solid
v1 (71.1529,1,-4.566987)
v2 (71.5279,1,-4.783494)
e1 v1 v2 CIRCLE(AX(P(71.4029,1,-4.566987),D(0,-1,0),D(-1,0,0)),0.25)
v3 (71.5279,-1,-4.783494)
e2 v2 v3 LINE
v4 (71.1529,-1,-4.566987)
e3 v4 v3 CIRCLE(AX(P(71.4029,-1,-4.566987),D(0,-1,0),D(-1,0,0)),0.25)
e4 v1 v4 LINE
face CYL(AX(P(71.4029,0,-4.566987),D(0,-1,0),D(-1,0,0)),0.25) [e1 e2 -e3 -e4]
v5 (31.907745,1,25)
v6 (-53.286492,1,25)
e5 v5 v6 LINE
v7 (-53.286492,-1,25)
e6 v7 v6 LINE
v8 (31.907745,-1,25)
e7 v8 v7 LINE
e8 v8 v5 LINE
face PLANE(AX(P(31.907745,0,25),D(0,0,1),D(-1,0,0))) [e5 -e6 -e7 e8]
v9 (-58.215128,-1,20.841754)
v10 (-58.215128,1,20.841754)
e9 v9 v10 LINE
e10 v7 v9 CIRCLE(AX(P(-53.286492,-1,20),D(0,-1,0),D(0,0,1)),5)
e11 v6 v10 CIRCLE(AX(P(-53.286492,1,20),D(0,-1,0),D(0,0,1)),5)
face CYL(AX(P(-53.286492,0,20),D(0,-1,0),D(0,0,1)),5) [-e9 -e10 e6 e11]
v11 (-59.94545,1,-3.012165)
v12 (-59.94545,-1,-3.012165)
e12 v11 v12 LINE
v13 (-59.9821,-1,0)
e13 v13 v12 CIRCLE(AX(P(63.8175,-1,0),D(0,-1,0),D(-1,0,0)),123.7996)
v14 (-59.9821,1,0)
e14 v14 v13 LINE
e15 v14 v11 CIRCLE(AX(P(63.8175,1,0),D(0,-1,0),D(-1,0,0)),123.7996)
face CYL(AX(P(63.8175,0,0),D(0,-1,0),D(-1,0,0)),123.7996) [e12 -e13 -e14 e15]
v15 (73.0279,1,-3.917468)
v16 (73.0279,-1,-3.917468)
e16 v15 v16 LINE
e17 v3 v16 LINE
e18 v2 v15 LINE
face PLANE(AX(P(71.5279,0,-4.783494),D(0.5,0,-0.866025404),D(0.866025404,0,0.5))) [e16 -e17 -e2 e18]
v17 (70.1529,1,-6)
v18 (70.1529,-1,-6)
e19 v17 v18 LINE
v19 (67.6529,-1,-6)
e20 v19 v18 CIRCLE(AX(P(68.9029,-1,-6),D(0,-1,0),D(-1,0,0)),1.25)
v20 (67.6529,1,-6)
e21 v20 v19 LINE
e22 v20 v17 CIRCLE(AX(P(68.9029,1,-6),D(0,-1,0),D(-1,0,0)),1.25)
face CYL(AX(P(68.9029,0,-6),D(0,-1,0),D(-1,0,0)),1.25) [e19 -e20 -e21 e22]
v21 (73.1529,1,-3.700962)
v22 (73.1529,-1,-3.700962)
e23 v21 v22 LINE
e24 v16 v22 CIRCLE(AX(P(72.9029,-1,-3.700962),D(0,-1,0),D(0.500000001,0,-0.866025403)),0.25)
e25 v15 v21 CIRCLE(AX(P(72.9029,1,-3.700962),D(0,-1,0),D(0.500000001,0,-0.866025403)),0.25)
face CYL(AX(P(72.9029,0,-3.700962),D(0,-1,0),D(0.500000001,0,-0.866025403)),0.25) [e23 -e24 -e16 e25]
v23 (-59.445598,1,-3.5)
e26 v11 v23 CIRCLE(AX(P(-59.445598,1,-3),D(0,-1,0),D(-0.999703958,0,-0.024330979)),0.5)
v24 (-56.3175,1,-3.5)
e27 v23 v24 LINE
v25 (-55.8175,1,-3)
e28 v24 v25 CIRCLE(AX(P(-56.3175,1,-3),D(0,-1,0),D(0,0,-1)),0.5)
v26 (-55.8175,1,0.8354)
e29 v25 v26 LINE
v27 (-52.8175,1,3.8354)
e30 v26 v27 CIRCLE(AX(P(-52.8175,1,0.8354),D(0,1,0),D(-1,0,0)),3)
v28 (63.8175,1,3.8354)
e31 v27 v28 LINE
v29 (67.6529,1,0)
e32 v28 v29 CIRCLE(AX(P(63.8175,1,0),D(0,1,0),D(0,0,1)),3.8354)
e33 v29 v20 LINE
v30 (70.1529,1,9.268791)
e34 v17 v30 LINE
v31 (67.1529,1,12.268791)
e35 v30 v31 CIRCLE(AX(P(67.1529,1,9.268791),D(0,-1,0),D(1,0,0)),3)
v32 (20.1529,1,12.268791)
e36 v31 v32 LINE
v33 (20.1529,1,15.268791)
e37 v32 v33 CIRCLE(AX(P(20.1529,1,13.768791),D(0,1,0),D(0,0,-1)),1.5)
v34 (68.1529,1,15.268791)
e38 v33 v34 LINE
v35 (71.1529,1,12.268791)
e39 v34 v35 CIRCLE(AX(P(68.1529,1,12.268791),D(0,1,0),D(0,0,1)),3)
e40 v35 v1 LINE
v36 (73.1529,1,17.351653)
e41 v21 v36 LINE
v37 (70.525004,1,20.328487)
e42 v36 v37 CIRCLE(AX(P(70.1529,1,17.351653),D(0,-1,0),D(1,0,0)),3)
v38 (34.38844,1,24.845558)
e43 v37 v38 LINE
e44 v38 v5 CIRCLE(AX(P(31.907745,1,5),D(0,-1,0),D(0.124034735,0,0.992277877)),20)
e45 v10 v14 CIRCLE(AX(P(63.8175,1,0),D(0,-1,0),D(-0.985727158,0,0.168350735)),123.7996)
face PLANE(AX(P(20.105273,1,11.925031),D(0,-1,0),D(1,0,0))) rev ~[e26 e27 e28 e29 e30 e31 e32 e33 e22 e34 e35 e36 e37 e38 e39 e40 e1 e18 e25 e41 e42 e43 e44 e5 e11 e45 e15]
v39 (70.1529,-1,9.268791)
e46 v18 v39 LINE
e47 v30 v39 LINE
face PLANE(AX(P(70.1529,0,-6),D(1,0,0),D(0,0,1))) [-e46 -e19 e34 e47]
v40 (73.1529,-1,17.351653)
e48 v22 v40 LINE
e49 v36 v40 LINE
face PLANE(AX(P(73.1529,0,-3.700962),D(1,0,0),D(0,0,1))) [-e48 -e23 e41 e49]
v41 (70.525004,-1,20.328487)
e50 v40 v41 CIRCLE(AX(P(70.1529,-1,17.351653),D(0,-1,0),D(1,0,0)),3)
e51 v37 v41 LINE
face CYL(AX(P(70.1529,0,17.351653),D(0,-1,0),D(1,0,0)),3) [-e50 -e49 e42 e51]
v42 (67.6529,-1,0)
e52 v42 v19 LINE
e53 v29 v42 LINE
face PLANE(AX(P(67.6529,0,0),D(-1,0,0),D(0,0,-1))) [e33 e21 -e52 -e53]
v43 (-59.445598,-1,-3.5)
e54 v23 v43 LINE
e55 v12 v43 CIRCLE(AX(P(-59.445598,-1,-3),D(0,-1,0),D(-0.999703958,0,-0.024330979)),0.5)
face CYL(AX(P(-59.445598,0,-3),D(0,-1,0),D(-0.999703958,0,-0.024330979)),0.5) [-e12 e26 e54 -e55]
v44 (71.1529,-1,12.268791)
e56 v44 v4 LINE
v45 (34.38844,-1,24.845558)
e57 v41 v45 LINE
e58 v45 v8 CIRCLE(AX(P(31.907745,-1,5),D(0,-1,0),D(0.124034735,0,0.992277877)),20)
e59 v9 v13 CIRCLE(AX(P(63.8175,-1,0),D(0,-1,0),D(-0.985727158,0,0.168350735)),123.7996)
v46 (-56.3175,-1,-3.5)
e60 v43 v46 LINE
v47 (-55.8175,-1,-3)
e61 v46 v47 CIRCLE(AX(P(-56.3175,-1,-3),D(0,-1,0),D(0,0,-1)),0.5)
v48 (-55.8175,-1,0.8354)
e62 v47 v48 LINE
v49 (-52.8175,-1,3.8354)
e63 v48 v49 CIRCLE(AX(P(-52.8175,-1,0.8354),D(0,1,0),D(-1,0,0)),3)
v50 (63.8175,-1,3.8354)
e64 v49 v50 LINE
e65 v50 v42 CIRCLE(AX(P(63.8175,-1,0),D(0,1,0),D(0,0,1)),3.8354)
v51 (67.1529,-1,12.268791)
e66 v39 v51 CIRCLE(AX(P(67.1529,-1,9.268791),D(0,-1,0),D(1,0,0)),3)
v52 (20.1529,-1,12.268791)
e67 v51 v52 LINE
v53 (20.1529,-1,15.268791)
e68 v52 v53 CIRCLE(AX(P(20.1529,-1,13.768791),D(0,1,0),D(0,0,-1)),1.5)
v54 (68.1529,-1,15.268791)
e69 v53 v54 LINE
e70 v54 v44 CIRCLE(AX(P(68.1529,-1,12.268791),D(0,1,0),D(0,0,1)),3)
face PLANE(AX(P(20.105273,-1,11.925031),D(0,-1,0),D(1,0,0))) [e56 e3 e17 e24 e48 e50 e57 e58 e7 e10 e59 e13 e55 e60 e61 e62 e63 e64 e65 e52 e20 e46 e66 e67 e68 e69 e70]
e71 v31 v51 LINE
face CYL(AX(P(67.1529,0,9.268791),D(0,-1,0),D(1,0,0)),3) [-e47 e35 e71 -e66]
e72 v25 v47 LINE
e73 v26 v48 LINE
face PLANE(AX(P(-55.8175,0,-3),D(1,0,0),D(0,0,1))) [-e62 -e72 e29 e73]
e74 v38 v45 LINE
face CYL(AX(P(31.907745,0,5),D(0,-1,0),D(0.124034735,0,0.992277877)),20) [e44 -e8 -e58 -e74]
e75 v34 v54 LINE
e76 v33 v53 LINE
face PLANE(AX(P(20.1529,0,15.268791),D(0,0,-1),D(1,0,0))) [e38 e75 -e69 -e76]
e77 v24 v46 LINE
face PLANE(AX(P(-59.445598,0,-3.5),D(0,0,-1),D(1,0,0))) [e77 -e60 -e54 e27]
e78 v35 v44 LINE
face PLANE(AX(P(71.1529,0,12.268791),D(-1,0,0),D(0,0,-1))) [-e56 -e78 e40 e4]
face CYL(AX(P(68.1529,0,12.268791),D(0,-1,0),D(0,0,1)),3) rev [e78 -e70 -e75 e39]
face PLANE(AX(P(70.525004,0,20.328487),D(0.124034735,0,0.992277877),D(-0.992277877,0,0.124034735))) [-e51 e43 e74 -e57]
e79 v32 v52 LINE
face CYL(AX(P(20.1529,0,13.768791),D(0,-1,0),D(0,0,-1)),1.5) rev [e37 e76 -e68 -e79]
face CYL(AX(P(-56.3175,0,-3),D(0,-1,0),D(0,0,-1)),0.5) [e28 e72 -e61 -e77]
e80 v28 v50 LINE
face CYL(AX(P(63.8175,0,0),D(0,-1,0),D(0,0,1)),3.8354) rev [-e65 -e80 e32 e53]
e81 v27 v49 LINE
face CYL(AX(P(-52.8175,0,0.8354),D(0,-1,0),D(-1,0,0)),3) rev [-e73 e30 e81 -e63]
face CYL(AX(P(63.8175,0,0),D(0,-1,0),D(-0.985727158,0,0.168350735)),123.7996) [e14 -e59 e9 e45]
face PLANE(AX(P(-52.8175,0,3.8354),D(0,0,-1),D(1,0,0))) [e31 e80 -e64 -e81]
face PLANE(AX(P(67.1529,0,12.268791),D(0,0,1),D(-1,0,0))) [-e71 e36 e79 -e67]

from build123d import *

# Parameters (mm, degrees)
F1_DEPTH = 1


# Not quite as in the source:
# - a feature names something its author has since deleted; it is built from what else it names


with BuildPart() as f1:
    # F0 (on Front) → F1 (new body, symmetric)
    with BuildSketch(Plane.XZ):
        with BuildLine():
            ThreePointArc((-58.215127866, 20.8417536759), (-59.5395660257, 10.4582609311), (-59.9821, 0))
            ThreePointArc((-59.9821, 0), (-59.9729371877, -1.5061942231), (-59.9454501071, -3.0121654896))
            ThreePointArc((-59.9454501071, -3.0121654896), (-59.7948238827, -3.3578286914), (-59.4455981282, -3.5))
            Line((-59.4455981282, -3.5), (-56.3175, -3.5))
            ThreePointArc((-56.3175, -3.5), (-55.9639466094, -3.3535533906), (-55.8175, -3))
            Line((-55.8175, -3), (-55.8175, 0.8354))
            ThreePointArc((-55.8175, 0.8354), (-54.9388203436, 2.9567203436), (-52.8175, 3.8354))
            Line((-52.8175, 3.8354), (63.8175, 3.8354))
            ThreePointArc((63.8175, 3.8354), (66.5295373486, 2.7120373486), (67.6529, 0))
            Line((67.6529, 0), (67.6529, -6))
            ThreePointArc((67.6529, -6), (68.9029, -7.25), (70.1529, -6))
            Line((70.1529, -6), (70.1529, 9.2687909752))
            ThreePointArc((70.1529, 9.2687909752), (69.2742203436, 11.3901113188), (67.1529, 12.2687909752))
            Line((67.1529, 12.2687909752), (20.1529, 12.2687909752))
            ThreePointArc((20.1529, 12.2687909752), (18.6529, 13.7687909752), (20.1529, 15.2687909752))
            Line((20.1529, 15.2687909752), (68.1529, 15.2687909752))
            ThreePointArc((68.1529, 15.2687909752), (70.2742203436, 14.3901113188), (71.1529, 12.2687909752))
            Line((71.1529, 12.2687909752), (71.1529, -4.5669872981))
            ThreePointArc((71.1529, -4.5669872981), (71.2779, -4.7834936491), (71.5279, -4.7834936491))
            Line((71.5279, -4.7834936491), (73.0279, -3.9174682453))
            ThreePointArc((73.0279, -3.9174682453), (73.1194063509, -3.8259618943), (73.1529, -3.7009618943))
            Line((73.1529, -3.7009618943), (73.1529, 17.3516533444))
            ThreePointArc((73.1529, 17.3516533444), (72.4019345274, 19.3370610341), (70.5250042038, 20.3284869745))
            Line((70.5250042038, 20.3284869745), (34.3884397258, 24.8455575343))
            ThreePointArc((34.3884397258, 24.8455575343), (33.1504938652, 24.961352042), (31.907745034, 25))
            Line((31.907745034, 25), (-53.2864920761, 25))
            ThreePointArc((-53.2864920761, 25), (-56.510715364, 23.8215682893), (-58.215127866, 20.8417536759))
        make_face()
    extrude(amount=F1_DEPTH, both=True)


solid = f1.part
